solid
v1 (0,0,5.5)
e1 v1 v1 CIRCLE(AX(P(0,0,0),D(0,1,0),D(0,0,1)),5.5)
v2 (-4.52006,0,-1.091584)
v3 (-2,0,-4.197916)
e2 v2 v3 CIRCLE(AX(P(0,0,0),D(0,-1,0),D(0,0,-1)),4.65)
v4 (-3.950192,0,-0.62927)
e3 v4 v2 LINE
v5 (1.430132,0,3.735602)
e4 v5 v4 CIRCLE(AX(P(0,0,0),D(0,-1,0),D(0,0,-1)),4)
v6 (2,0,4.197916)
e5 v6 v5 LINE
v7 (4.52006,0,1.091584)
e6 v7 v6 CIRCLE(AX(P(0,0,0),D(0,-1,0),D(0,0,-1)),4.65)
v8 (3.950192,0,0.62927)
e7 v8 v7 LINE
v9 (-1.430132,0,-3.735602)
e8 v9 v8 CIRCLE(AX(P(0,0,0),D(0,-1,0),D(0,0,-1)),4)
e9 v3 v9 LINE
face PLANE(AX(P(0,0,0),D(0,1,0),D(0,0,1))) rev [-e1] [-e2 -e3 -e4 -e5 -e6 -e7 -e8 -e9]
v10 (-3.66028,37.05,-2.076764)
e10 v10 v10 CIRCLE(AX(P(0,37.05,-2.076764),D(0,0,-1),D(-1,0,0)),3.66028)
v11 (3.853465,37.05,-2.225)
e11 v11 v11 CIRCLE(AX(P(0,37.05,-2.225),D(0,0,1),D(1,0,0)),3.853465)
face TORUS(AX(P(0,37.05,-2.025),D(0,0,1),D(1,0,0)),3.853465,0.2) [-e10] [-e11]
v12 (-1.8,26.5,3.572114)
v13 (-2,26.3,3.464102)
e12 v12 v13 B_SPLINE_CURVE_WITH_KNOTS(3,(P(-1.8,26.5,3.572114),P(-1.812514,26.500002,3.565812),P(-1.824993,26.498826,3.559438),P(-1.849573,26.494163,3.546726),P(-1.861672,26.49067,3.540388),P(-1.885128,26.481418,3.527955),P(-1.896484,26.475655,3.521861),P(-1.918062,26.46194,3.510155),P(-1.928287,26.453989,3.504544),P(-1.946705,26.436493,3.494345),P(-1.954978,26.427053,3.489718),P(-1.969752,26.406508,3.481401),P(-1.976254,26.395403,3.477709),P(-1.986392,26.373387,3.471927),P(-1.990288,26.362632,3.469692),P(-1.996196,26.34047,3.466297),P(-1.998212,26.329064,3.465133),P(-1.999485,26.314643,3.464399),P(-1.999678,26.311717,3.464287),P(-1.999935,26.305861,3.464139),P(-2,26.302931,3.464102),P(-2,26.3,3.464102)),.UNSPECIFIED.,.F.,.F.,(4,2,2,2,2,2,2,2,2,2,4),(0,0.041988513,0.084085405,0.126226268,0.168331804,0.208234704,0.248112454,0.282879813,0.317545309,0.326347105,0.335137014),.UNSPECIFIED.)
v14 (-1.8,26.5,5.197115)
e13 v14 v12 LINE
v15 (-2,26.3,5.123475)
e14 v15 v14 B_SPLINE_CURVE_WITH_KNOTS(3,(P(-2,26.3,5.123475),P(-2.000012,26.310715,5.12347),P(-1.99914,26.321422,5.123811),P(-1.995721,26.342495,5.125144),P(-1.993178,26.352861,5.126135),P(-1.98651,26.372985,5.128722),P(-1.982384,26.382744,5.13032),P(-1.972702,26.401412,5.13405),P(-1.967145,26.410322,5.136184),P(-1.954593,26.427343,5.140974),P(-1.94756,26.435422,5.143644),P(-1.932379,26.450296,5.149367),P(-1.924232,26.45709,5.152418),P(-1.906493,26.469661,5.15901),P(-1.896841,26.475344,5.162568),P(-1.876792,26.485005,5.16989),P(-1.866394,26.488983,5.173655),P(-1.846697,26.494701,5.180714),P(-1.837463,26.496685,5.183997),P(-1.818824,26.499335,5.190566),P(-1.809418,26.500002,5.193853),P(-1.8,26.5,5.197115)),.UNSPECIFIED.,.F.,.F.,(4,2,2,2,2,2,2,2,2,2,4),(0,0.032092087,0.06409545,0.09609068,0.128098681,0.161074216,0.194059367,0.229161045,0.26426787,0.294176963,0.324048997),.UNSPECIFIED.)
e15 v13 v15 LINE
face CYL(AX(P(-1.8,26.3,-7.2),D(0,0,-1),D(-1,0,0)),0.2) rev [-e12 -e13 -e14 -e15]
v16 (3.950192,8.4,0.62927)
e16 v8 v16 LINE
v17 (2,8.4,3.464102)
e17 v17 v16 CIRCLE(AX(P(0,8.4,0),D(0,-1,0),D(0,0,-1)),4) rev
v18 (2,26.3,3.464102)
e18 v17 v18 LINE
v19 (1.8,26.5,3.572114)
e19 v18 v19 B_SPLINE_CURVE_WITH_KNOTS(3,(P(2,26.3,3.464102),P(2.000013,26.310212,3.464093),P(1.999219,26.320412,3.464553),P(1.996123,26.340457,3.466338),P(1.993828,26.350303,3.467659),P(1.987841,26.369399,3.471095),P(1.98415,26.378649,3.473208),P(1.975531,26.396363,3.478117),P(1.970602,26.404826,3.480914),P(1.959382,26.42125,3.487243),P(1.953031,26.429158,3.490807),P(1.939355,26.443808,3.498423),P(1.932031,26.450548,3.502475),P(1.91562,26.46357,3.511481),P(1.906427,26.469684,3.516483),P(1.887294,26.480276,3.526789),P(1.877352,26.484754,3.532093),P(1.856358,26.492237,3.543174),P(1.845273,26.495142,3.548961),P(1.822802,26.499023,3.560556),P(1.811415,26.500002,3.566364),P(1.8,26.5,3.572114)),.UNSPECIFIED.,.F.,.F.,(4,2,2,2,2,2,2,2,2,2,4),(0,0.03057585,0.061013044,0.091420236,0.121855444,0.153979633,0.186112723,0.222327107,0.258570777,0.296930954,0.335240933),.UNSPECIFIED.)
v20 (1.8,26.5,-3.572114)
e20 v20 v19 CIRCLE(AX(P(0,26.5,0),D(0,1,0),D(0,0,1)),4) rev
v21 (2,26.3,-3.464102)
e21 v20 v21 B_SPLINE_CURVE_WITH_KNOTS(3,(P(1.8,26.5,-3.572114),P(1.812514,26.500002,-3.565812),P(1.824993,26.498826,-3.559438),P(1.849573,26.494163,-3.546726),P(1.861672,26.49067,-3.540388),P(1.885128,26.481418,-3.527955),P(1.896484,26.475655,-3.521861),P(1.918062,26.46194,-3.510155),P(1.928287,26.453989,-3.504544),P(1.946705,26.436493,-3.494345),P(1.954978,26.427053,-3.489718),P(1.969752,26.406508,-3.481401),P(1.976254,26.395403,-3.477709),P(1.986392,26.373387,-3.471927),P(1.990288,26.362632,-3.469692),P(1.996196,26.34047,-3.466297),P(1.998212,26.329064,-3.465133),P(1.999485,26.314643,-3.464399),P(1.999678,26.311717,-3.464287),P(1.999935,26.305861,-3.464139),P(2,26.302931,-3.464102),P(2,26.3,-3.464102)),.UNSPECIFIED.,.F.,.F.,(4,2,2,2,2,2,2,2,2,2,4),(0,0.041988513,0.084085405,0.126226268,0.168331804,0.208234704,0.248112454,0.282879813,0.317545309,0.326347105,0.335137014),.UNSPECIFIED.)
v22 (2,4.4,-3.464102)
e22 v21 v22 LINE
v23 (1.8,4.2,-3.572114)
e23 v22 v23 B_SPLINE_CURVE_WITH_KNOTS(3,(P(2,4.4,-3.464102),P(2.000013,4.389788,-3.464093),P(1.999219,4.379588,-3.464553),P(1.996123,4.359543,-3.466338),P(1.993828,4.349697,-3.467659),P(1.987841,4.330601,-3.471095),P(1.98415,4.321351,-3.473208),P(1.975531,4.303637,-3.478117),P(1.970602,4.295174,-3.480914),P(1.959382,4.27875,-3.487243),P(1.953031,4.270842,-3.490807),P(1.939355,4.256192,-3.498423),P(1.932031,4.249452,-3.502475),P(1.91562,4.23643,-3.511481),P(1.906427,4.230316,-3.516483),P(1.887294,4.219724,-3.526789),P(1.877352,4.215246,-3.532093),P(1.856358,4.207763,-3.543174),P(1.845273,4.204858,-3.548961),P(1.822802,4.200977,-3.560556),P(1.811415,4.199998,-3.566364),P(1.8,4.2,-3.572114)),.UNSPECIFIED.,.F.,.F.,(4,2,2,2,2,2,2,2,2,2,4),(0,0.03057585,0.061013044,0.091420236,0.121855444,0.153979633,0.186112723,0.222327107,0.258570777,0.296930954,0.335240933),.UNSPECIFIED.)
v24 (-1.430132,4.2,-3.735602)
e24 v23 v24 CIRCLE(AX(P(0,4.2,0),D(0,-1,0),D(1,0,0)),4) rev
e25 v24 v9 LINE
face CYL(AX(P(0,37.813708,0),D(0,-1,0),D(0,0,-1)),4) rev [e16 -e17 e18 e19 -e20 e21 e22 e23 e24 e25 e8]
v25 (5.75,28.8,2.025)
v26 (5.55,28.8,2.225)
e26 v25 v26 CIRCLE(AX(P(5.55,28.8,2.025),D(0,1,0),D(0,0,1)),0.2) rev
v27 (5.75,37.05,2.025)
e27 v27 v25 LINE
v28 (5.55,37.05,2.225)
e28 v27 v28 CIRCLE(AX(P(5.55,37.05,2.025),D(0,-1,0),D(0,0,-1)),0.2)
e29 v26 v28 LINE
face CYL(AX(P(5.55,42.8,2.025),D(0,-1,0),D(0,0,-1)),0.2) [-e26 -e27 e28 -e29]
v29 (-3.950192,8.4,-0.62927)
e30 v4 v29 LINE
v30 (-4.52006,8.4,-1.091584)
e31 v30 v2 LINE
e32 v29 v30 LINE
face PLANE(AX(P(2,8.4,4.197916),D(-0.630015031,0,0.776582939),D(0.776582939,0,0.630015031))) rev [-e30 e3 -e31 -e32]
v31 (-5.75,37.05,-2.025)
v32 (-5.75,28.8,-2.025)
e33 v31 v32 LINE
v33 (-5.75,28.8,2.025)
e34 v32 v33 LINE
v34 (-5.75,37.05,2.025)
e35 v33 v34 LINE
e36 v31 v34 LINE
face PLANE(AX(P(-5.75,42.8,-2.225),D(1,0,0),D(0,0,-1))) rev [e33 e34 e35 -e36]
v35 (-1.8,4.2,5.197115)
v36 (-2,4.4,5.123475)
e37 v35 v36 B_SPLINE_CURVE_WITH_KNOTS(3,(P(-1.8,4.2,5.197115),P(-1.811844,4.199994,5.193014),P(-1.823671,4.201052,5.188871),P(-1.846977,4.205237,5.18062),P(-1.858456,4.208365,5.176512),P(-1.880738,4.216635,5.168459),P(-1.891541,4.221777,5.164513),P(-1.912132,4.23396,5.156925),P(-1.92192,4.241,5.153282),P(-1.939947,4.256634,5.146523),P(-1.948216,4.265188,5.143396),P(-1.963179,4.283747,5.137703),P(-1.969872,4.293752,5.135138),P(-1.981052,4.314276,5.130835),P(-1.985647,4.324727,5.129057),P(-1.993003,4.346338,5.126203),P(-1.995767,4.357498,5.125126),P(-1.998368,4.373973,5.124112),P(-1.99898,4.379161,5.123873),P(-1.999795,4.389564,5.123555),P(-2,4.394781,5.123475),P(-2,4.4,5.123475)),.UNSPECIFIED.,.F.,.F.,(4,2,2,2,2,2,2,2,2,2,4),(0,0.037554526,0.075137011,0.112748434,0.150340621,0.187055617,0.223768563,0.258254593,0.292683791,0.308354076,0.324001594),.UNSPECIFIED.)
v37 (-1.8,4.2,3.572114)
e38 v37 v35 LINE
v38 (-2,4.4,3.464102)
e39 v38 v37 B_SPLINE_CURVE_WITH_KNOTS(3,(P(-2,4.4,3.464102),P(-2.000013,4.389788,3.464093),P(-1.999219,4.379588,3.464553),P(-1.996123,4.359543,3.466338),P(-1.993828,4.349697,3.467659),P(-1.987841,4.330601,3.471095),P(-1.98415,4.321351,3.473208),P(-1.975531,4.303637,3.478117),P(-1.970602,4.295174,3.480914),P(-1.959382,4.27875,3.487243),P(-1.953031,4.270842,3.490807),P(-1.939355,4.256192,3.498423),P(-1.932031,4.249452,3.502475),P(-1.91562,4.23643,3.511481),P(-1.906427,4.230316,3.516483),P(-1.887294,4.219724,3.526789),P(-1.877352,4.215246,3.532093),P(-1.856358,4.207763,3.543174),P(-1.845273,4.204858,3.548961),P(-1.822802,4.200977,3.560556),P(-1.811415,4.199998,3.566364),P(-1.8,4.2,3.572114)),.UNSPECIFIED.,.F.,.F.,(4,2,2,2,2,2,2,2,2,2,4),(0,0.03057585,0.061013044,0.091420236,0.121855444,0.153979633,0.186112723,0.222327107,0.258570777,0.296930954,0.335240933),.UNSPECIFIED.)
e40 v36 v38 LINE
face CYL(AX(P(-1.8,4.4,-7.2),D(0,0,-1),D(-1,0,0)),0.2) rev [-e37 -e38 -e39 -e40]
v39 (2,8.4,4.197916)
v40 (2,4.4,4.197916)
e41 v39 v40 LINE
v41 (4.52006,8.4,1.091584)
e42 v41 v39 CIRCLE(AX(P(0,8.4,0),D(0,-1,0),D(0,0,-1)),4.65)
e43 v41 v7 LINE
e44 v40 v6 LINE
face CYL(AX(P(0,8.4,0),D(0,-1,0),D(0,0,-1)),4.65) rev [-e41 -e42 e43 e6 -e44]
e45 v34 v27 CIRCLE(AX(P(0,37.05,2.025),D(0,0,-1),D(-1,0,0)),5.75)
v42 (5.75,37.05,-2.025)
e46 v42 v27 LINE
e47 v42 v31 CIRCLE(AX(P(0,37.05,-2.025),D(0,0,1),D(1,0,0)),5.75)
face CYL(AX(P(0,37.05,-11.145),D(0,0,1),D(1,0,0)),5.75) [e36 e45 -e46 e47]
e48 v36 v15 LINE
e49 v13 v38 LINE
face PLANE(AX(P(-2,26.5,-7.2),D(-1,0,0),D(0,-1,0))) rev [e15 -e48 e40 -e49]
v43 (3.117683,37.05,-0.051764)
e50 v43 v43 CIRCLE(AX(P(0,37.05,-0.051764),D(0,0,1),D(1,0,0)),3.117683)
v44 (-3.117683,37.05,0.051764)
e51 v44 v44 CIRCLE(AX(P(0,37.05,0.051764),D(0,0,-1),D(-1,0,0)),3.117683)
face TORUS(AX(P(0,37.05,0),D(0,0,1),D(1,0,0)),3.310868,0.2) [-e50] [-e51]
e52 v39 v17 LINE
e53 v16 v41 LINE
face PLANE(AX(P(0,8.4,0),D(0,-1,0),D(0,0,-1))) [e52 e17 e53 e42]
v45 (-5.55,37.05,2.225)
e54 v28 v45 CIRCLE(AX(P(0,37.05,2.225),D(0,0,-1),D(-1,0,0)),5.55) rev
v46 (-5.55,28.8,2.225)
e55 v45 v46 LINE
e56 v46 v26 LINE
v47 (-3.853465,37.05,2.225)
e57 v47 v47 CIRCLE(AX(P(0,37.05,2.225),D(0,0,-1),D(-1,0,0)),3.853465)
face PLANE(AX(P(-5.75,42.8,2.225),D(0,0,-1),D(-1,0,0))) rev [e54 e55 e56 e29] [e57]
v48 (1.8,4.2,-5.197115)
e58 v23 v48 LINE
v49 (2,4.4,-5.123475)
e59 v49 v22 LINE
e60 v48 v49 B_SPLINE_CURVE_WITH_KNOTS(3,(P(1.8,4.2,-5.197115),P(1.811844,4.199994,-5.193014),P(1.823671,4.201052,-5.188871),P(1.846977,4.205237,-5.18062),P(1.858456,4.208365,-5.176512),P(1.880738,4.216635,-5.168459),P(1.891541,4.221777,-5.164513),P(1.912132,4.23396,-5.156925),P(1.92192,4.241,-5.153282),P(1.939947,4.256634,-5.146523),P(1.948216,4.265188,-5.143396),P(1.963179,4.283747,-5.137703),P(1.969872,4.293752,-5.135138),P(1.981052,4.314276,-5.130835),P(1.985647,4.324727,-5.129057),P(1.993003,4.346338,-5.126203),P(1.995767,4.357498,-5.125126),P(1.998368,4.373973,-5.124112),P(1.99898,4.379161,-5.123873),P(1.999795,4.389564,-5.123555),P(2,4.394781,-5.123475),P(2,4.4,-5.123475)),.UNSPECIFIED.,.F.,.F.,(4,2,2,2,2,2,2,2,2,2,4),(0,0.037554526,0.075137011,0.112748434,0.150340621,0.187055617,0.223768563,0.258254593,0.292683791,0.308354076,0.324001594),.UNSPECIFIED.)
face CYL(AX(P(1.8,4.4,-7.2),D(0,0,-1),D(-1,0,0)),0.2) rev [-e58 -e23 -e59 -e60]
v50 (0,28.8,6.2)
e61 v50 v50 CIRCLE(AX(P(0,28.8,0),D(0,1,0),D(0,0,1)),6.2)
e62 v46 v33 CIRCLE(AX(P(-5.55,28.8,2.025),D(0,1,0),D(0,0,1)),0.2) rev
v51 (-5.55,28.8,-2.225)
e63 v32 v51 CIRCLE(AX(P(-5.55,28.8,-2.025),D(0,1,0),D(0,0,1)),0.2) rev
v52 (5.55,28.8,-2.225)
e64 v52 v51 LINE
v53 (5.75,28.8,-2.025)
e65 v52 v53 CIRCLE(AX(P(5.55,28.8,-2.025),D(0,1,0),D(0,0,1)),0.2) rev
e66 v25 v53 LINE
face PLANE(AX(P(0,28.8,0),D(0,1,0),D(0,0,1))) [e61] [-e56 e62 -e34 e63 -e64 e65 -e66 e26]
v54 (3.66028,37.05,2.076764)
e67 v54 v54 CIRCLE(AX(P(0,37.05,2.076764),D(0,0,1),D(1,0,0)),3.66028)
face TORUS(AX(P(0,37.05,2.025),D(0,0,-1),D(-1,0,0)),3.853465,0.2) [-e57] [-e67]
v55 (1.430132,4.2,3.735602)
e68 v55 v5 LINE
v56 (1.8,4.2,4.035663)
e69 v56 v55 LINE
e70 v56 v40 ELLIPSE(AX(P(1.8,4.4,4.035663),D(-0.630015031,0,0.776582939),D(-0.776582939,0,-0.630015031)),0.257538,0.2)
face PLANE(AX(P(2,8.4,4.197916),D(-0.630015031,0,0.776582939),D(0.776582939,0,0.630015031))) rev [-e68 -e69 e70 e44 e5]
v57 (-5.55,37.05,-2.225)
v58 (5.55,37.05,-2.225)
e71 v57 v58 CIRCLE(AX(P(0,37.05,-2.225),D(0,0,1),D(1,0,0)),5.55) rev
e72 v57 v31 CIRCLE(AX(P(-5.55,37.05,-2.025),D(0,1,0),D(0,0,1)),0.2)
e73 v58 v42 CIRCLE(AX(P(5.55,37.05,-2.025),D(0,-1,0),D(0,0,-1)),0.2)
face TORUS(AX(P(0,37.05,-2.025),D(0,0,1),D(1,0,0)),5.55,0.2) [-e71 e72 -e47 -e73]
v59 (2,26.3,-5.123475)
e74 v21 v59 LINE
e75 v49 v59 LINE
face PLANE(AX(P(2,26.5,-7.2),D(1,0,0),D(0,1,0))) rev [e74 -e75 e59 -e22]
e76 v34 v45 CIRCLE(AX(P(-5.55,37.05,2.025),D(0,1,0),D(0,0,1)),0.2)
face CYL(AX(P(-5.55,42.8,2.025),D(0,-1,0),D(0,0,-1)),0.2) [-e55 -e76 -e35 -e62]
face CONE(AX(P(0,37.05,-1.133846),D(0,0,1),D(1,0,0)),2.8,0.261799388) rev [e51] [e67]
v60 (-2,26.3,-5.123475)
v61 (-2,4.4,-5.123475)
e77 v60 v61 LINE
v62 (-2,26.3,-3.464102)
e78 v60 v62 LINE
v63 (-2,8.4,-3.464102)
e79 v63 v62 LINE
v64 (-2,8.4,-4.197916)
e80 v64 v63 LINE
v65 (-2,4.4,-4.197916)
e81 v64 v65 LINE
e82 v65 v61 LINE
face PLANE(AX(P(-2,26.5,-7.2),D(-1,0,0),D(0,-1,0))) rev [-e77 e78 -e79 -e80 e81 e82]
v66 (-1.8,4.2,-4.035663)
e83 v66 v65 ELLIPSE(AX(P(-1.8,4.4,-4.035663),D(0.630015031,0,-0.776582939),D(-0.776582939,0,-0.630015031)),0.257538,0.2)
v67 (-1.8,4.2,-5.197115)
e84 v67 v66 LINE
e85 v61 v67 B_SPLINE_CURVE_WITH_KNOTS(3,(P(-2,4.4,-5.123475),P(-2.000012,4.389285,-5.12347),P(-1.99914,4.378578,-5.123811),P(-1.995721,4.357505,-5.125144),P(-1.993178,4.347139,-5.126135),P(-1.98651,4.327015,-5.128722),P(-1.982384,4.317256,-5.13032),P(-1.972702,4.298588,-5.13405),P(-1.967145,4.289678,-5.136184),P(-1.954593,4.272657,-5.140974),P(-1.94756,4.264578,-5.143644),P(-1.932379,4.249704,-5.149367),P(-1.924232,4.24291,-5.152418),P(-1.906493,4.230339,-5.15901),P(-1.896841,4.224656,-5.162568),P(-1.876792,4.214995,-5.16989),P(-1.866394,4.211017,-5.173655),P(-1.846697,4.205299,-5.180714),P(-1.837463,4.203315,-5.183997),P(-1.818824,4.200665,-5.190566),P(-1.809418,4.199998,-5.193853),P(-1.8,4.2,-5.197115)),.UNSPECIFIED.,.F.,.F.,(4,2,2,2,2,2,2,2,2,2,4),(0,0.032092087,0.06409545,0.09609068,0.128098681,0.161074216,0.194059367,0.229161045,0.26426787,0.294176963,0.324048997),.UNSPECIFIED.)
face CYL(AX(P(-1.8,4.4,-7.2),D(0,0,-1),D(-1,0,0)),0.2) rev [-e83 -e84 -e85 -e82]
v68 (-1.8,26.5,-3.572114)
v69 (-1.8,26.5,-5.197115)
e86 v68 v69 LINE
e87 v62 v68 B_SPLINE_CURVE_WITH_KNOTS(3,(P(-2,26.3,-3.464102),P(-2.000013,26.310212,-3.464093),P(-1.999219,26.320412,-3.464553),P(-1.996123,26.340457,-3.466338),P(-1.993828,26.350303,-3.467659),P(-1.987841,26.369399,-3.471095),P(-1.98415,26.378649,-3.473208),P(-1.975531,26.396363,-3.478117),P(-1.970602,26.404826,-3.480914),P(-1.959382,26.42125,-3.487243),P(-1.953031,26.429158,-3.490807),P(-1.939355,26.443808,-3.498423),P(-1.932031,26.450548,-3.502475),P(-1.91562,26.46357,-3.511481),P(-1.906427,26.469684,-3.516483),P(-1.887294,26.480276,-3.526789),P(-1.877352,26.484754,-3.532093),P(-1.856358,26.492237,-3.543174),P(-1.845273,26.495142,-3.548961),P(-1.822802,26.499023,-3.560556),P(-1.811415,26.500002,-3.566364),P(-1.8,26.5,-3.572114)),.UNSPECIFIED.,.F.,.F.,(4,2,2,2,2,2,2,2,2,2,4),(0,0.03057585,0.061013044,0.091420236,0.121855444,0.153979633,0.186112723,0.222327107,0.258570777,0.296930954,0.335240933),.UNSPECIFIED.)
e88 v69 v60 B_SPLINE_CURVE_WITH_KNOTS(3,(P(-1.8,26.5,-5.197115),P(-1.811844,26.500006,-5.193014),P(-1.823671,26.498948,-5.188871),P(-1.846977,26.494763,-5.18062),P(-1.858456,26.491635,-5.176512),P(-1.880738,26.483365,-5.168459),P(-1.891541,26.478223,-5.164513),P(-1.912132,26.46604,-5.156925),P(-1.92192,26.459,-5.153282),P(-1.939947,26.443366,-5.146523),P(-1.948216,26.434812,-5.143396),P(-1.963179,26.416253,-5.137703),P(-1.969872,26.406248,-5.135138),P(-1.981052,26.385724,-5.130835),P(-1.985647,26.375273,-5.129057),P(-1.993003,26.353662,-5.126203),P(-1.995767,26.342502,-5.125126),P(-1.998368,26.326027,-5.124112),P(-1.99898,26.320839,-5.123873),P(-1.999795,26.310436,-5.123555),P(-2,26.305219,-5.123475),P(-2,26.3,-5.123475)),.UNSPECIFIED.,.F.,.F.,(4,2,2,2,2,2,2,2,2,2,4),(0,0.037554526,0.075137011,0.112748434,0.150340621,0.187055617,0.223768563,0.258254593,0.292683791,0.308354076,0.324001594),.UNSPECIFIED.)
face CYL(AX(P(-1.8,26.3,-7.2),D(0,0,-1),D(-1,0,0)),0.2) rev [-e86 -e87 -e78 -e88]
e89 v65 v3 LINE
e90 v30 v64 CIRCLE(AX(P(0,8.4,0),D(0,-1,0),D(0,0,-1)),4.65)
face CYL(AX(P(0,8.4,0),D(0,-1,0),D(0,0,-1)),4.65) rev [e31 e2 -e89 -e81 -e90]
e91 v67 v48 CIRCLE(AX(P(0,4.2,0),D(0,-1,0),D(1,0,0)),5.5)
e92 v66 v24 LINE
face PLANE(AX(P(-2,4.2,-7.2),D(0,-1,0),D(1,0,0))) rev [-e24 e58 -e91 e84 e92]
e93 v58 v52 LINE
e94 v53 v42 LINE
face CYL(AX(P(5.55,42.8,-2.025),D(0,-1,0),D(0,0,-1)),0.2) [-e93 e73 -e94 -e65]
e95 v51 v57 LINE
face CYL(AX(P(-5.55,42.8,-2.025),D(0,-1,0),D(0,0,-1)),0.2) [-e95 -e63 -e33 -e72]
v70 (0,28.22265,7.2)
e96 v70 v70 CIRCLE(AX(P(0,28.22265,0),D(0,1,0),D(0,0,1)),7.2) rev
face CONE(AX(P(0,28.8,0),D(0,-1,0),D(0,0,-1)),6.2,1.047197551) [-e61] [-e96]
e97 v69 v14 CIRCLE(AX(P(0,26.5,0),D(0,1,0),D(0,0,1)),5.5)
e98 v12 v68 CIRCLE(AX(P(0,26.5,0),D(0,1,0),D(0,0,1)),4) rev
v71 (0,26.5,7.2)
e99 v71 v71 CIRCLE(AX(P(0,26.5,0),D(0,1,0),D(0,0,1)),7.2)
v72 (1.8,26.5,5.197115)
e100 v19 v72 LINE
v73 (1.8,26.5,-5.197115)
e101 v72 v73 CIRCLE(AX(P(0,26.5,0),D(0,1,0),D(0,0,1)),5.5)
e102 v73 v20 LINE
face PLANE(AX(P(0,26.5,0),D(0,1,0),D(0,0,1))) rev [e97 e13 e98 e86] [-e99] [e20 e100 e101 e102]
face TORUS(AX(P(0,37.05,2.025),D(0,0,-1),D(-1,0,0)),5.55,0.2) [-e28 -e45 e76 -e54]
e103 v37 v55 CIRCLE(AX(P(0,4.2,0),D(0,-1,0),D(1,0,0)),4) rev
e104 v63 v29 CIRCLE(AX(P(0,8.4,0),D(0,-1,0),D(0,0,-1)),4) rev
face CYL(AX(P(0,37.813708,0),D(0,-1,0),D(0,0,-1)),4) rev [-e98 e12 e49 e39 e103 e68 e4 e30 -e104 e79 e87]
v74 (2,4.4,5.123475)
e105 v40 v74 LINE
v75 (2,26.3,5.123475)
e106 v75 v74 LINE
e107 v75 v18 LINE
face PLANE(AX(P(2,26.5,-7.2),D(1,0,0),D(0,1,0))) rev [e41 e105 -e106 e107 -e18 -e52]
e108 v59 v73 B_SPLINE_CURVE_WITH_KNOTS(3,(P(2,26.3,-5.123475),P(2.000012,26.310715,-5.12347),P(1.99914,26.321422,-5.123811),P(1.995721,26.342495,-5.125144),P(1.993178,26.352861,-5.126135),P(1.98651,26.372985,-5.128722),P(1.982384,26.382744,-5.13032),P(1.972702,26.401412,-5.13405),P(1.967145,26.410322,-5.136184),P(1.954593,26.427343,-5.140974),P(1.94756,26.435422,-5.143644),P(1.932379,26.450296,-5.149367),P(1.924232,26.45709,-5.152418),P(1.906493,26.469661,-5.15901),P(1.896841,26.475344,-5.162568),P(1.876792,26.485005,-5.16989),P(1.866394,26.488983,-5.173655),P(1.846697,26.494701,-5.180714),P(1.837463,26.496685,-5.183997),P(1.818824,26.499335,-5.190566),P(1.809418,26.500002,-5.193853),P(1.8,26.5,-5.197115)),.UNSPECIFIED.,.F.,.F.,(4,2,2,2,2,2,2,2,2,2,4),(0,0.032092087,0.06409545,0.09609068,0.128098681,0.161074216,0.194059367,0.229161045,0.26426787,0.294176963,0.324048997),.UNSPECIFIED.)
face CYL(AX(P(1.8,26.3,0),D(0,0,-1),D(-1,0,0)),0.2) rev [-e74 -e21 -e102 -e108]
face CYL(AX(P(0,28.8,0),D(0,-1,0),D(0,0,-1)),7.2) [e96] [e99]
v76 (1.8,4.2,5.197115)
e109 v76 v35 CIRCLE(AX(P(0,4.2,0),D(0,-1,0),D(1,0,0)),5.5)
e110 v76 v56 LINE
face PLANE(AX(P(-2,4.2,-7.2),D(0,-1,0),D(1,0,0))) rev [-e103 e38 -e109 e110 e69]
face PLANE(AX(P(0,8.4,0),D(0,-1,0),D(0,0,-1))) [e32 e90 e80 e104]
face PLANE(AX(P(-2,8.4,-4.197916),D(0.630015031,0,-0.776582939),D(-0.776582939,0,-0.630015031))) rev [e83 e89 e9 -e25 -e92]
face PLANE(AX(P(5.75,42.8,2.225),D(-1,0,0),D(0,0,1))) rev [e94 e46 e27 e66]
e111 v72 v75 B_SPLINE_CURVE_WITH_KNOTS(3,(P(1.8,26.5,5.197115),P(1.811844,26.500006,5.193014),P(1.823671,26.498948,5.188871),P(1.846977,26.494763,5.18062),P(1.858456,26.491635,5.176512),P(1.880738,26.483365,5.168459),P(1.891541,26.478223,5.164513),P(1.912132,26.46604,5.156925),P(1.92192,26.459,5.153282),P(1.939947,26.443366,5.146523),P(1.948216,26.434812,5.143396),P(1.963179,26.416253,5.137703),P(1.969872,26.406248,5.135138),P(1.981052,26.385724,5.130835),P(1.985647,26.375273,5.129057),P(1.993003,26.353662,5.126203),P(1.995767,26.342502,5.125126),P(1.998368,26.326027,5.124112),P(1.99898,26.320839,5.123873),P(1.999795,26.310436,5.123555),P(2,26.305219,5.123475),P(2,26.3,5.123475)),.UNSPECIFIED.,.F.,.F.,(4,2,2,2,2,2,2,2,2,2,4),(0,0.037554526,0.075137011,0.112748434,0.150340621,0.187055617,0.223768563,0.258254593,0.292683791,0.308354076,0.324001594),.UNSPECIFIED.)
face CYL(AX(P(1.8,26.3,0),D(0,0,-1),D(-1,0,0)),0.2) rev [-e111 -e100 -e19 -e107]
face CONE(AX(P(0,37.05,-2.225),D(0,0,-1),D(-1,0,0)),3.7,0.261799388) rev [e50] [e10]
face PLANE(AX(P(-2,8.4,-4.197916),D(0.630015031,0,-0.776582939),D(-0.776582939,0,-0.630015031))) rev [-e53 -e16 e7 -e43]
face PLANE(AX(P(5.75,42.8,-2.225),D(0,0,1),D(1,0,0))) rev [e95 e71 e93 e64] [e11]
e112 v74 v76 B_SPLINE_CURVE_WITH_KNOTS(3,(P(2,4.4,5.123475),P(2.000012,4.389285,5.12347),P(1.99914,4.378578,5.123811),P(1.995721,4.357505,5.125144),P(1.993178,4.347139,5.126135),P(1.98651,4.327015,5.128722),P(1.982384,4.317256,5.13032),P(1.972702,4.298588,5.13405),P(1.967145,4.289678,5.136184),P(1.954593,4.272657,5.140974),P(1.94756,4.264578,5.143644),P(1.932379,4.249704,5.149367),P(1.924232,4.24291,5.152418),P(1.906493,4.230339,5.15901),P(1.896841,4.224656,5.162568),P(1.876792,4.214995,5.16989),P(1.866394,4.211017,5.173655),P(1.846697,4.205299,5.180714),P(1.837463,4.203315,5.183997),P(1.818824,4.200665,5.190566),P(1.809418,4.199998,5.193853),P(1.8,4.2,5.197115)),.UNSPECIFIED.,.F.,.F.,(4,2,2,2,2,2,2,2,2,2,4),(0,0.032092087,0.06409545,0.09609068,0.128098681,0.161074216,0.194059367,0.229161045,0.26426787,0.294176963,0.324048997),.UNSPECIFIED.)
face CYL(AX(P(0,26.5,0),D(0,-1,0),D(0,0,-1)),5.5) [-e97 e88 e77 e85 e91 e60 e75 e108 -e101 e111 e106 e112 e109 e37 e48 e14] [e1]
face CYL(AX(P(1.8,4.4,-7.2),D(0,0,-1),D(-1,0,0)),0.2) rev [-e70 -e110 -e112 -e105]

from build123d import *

# Parameters (mm, degrees)
CROQUIS1_R              = 5.5
SALIENTE_EXTRUIR1_DEPTH = 26.5
CROQUIS2_R              = 7.2
SALIENTE_EXTRUIR2_DEPTH = 2.3
CROQUIS3_W              = 11.5
CROQUIS3_H              = 4.45
SALIENTE_EXTRUIR3_DEPTH = 14
CORTAR_EXTRUIR1_DEPTH   = 13.37
CROQUIS6_R              = 4
CORTAR_EXTRUIR2_DEPTH   = 26.5
CROQUIS7_R              = 2.8
CORTAR_EXTRUIR3_DEPTH   = 26.37
CHAFL_N1_SIZE           = 0.9
CHAFL_N1_SIZE2          = 3.358845727
CHAFL_N2_SIZE           = 3.358845727
CHAFL_N2_SIZE_2         = 0.9
REDONDEO1_R             = 0.2
REDONDEO2_R             = 0.2
CROQUIS11_W             = 4
CROQUIS11_H             = 22.3
CORTAR_EXTRUIR4_DEPTH   = 48.550085436
CORTAR_EXTRUIR5_DEPTH   = 8.4
REDONDEO3_R             = 0.2
CHAFL_N3_SIZE           = 1
CHAFL_N3_SIZE2          = 0.577350269


with BuildPart() as part:
    # Croquis1 → Saliente-Extruir1 (new body)
    with BuildSketch(Plane(origin=(0, 0, 0), x_dir=(1, 0, 0), z_dir=(0, 1, 0))):
        with Locations(Location((0, 0, 0), (0, 0, 270))):
            Circle(CROQUIS1_R)
    extrude(amount=SALIENTE_EXTRUIR1_DEPTH)

    # Croquis2 → Saliente-Extruir2 (add)
    with BuildSketch(Plane(origin=(0, 26.5, 0), x_dir=(1, 0, 0), z_dir=(0, 1, 0))):
        with Locations(Location((0, 0, 0), (0, 0, 270))):
            Circle(CROQUIS2_R)
    extrude(amount=SALIENTE_EXTRUIR2_DEPTH)

    # Croquis3 → Saliente-Extruir3 (add)
    with BuildSketch(Plane(origin=(0, 28.8, 0), x_dir=(1, 0, 0), z_dir=(0, 1, 0))):
        Rectangle(CROQUIS3_W, CROQUIS3_H)
    extrude(amount=SALIENTE_EXTRUIR3_DEPTH)

    # Croquis4 → Cortar-Extruir1 (cut)
    with BuildSketch(Plane.XY.offset(2.225)):
        with BuildLine():
            Line((5.75, 42.8), (0, 42.8))
            ThreePointArc((0, 42.8), (4.065863992, 41.115863992), (5.75, 37.05))
            Line((5.75, 37.05), (5.75, 42.8))
        make_face()
        with BuildLine():
            Line((0, 42.8), (-5.75, 42.8))
            Line((-5.75, 42.8), (-5.75, 37.05))
            ThreePointArc((-5.75, 37.05), (-4.065863992, 41.115863992), (0, 42.8))
        make_face()
    extrude(amount=-CORTAR_EXTRUIR1_DEPTH, mode=Mode.SUBTRACT)

    # Croquis6 → Cortar-Extruir2 (cut)
    with BuildSketch(Plane.XZ):
        with Locations(Location((0, 0, 0), (0, 0, 270))):
            Circle(CROQUIS6_R)
    extrude(amount=-CORTAR_EXTRUIR2_DEPTH, mode=Mode.SUBTRACT)

    # Croquis7 → Cortar-Extruir3 (cut)
    with BuildSketch(Plane.XY.offset(2.225)):
        with Locations((0, 37.05)):
            Circle(CROQUIS7_R)
    extrude(amount=-CORTAR_EXTRUIR3_DEPTH, mode=Mode.SUBTRACT)

    # Chaflán1
    chafl_n1_edges = [part.edges().sort_by_distance(p)[0] for p in [
        (-2.8, 37.05, 2.225),
    ]]
    chafl_n1_side = [part.faces().sort_by_distance(p)[0] for p in [
        (0, 28.981176709, 2.225),
    ]]
    chamfer(chafl_n1_edges, length=CHAFL_N1_SIZE, length2=CHAFL_N1_SIZE2, reference=chafl_n1_side[0])

    # Chaflán2
    # the kernel refuses this chamfer: 3.358845727, 0.9 mm, written as the material it takes off along each edge
    with BuildSketch(Plane(origin=(0, 37.05, -2.225), x_dir=(1, 0, 0), z_dir=(0, -1, 0))) as chafl_n2_piece_1:
        Polygon((2.8, CHAFL_N2_SIZE), (2.8 + CHAFL_N2_SIZE_2, 0), (2.8, 0), align=None)
    revolve(axis=Axis((0, 37.05, -2.225), (0, 0, 1)), mode=Mode.SUBTRACT)

    # Redondeo1
    redondeo1_edges = [part.edges().sort_by_distance(p)[0] for p in [
        (-5.75, 32.925, 2.225),
        (-5.75, 32.925, -2.225),
        (0, 42.8, 2.225),
        (0, 42.8, -2.225),
        (5.75, 32.925, -2.225),
        (5.75, 32.925, 2.225),
    ]]
    fillet(redondeo1_edges, radius=REDONDEO1_R)

    # Redondeo2
    redondeo2_edges = [part.edges().sort_by_distance(p)[0] for p in [
        (-3.7, 37.05, 2.225),
        (-3.7, 37.05, -2.225),
        (-3.103813047, 37.05, 0),
    ]]
    fillet(redondeo2_edges, radius=REDONDEO2_R)

    # Croquis11 → Cortar-Extruir4 (cut, through all)
    with BuildSketch(Plane.XY.offset(12.225)):
        with Locations((0, 15.35)):
            Rectangle(CROQUIS11_W, CROQUIS11_H)
    extrude(amount=-CORTAR_EXTRUIR4_DEPTH, mode=Mode.SUBTRACT)

    # Croquis13 → Cortar-Extruir5 (cut)
    with BuildSketch(Plane.XZ):
        with BuildLine():
            Line((-2, -4.19791615), (4.520060123, 1.091584394))
            ThreePointArc((4.520060123, 1.091584394), (3.611110666, 2.929569892), (2, 4.19791615))
            Line((2, 4.19791615), (-4.520060123, -1.091584394))
            ThreePointArc((-4.520060123, -1.091584394), (-3.611110666, -2.929569892), (-2, -4.19791615))
        make_face()
    extrude(amount=-CORTAR_EXTRUIR5_DEPTH, mode=Mode.SUBTRACT)

    # Redondeo3
    redondeo3_edges = [part.edges().sort_by_distance(p)[0] for p in [
        (-2, 4.2, -4.660695766),
        (-2, 4.2, 4.293788499),
        (-2, 26.5, -4.293788499),
        (-2, 26.5, 4.293788499),
        (2, 26.5, 4.293788499),
        (2, 26.5, -4.293788499),
        (2, 4.2, -4.293788499),
        (2, 4.2, 4.660695766),
    ]]
    fillet(redondeo3_edges, radius=REDONDEO3_R)

    # Chaflán3
    chafl_n3_edges = [part.edges().sort_by_distance(p)[0] for p in [
        (0, 28.8, -7.2),
    ]]
    chafl_n3_side = [part.faces().sort_by_distance(p)[0] for p in [
        (-5.953646753, 28.8, 0),
    ]]
    chamfer(chafl_n3_edges, length=CHAFL_N3_SIZE, length2=CHAFL_N3_SIZE2, reference=chafl_n3_side[0])


solid = part.part
